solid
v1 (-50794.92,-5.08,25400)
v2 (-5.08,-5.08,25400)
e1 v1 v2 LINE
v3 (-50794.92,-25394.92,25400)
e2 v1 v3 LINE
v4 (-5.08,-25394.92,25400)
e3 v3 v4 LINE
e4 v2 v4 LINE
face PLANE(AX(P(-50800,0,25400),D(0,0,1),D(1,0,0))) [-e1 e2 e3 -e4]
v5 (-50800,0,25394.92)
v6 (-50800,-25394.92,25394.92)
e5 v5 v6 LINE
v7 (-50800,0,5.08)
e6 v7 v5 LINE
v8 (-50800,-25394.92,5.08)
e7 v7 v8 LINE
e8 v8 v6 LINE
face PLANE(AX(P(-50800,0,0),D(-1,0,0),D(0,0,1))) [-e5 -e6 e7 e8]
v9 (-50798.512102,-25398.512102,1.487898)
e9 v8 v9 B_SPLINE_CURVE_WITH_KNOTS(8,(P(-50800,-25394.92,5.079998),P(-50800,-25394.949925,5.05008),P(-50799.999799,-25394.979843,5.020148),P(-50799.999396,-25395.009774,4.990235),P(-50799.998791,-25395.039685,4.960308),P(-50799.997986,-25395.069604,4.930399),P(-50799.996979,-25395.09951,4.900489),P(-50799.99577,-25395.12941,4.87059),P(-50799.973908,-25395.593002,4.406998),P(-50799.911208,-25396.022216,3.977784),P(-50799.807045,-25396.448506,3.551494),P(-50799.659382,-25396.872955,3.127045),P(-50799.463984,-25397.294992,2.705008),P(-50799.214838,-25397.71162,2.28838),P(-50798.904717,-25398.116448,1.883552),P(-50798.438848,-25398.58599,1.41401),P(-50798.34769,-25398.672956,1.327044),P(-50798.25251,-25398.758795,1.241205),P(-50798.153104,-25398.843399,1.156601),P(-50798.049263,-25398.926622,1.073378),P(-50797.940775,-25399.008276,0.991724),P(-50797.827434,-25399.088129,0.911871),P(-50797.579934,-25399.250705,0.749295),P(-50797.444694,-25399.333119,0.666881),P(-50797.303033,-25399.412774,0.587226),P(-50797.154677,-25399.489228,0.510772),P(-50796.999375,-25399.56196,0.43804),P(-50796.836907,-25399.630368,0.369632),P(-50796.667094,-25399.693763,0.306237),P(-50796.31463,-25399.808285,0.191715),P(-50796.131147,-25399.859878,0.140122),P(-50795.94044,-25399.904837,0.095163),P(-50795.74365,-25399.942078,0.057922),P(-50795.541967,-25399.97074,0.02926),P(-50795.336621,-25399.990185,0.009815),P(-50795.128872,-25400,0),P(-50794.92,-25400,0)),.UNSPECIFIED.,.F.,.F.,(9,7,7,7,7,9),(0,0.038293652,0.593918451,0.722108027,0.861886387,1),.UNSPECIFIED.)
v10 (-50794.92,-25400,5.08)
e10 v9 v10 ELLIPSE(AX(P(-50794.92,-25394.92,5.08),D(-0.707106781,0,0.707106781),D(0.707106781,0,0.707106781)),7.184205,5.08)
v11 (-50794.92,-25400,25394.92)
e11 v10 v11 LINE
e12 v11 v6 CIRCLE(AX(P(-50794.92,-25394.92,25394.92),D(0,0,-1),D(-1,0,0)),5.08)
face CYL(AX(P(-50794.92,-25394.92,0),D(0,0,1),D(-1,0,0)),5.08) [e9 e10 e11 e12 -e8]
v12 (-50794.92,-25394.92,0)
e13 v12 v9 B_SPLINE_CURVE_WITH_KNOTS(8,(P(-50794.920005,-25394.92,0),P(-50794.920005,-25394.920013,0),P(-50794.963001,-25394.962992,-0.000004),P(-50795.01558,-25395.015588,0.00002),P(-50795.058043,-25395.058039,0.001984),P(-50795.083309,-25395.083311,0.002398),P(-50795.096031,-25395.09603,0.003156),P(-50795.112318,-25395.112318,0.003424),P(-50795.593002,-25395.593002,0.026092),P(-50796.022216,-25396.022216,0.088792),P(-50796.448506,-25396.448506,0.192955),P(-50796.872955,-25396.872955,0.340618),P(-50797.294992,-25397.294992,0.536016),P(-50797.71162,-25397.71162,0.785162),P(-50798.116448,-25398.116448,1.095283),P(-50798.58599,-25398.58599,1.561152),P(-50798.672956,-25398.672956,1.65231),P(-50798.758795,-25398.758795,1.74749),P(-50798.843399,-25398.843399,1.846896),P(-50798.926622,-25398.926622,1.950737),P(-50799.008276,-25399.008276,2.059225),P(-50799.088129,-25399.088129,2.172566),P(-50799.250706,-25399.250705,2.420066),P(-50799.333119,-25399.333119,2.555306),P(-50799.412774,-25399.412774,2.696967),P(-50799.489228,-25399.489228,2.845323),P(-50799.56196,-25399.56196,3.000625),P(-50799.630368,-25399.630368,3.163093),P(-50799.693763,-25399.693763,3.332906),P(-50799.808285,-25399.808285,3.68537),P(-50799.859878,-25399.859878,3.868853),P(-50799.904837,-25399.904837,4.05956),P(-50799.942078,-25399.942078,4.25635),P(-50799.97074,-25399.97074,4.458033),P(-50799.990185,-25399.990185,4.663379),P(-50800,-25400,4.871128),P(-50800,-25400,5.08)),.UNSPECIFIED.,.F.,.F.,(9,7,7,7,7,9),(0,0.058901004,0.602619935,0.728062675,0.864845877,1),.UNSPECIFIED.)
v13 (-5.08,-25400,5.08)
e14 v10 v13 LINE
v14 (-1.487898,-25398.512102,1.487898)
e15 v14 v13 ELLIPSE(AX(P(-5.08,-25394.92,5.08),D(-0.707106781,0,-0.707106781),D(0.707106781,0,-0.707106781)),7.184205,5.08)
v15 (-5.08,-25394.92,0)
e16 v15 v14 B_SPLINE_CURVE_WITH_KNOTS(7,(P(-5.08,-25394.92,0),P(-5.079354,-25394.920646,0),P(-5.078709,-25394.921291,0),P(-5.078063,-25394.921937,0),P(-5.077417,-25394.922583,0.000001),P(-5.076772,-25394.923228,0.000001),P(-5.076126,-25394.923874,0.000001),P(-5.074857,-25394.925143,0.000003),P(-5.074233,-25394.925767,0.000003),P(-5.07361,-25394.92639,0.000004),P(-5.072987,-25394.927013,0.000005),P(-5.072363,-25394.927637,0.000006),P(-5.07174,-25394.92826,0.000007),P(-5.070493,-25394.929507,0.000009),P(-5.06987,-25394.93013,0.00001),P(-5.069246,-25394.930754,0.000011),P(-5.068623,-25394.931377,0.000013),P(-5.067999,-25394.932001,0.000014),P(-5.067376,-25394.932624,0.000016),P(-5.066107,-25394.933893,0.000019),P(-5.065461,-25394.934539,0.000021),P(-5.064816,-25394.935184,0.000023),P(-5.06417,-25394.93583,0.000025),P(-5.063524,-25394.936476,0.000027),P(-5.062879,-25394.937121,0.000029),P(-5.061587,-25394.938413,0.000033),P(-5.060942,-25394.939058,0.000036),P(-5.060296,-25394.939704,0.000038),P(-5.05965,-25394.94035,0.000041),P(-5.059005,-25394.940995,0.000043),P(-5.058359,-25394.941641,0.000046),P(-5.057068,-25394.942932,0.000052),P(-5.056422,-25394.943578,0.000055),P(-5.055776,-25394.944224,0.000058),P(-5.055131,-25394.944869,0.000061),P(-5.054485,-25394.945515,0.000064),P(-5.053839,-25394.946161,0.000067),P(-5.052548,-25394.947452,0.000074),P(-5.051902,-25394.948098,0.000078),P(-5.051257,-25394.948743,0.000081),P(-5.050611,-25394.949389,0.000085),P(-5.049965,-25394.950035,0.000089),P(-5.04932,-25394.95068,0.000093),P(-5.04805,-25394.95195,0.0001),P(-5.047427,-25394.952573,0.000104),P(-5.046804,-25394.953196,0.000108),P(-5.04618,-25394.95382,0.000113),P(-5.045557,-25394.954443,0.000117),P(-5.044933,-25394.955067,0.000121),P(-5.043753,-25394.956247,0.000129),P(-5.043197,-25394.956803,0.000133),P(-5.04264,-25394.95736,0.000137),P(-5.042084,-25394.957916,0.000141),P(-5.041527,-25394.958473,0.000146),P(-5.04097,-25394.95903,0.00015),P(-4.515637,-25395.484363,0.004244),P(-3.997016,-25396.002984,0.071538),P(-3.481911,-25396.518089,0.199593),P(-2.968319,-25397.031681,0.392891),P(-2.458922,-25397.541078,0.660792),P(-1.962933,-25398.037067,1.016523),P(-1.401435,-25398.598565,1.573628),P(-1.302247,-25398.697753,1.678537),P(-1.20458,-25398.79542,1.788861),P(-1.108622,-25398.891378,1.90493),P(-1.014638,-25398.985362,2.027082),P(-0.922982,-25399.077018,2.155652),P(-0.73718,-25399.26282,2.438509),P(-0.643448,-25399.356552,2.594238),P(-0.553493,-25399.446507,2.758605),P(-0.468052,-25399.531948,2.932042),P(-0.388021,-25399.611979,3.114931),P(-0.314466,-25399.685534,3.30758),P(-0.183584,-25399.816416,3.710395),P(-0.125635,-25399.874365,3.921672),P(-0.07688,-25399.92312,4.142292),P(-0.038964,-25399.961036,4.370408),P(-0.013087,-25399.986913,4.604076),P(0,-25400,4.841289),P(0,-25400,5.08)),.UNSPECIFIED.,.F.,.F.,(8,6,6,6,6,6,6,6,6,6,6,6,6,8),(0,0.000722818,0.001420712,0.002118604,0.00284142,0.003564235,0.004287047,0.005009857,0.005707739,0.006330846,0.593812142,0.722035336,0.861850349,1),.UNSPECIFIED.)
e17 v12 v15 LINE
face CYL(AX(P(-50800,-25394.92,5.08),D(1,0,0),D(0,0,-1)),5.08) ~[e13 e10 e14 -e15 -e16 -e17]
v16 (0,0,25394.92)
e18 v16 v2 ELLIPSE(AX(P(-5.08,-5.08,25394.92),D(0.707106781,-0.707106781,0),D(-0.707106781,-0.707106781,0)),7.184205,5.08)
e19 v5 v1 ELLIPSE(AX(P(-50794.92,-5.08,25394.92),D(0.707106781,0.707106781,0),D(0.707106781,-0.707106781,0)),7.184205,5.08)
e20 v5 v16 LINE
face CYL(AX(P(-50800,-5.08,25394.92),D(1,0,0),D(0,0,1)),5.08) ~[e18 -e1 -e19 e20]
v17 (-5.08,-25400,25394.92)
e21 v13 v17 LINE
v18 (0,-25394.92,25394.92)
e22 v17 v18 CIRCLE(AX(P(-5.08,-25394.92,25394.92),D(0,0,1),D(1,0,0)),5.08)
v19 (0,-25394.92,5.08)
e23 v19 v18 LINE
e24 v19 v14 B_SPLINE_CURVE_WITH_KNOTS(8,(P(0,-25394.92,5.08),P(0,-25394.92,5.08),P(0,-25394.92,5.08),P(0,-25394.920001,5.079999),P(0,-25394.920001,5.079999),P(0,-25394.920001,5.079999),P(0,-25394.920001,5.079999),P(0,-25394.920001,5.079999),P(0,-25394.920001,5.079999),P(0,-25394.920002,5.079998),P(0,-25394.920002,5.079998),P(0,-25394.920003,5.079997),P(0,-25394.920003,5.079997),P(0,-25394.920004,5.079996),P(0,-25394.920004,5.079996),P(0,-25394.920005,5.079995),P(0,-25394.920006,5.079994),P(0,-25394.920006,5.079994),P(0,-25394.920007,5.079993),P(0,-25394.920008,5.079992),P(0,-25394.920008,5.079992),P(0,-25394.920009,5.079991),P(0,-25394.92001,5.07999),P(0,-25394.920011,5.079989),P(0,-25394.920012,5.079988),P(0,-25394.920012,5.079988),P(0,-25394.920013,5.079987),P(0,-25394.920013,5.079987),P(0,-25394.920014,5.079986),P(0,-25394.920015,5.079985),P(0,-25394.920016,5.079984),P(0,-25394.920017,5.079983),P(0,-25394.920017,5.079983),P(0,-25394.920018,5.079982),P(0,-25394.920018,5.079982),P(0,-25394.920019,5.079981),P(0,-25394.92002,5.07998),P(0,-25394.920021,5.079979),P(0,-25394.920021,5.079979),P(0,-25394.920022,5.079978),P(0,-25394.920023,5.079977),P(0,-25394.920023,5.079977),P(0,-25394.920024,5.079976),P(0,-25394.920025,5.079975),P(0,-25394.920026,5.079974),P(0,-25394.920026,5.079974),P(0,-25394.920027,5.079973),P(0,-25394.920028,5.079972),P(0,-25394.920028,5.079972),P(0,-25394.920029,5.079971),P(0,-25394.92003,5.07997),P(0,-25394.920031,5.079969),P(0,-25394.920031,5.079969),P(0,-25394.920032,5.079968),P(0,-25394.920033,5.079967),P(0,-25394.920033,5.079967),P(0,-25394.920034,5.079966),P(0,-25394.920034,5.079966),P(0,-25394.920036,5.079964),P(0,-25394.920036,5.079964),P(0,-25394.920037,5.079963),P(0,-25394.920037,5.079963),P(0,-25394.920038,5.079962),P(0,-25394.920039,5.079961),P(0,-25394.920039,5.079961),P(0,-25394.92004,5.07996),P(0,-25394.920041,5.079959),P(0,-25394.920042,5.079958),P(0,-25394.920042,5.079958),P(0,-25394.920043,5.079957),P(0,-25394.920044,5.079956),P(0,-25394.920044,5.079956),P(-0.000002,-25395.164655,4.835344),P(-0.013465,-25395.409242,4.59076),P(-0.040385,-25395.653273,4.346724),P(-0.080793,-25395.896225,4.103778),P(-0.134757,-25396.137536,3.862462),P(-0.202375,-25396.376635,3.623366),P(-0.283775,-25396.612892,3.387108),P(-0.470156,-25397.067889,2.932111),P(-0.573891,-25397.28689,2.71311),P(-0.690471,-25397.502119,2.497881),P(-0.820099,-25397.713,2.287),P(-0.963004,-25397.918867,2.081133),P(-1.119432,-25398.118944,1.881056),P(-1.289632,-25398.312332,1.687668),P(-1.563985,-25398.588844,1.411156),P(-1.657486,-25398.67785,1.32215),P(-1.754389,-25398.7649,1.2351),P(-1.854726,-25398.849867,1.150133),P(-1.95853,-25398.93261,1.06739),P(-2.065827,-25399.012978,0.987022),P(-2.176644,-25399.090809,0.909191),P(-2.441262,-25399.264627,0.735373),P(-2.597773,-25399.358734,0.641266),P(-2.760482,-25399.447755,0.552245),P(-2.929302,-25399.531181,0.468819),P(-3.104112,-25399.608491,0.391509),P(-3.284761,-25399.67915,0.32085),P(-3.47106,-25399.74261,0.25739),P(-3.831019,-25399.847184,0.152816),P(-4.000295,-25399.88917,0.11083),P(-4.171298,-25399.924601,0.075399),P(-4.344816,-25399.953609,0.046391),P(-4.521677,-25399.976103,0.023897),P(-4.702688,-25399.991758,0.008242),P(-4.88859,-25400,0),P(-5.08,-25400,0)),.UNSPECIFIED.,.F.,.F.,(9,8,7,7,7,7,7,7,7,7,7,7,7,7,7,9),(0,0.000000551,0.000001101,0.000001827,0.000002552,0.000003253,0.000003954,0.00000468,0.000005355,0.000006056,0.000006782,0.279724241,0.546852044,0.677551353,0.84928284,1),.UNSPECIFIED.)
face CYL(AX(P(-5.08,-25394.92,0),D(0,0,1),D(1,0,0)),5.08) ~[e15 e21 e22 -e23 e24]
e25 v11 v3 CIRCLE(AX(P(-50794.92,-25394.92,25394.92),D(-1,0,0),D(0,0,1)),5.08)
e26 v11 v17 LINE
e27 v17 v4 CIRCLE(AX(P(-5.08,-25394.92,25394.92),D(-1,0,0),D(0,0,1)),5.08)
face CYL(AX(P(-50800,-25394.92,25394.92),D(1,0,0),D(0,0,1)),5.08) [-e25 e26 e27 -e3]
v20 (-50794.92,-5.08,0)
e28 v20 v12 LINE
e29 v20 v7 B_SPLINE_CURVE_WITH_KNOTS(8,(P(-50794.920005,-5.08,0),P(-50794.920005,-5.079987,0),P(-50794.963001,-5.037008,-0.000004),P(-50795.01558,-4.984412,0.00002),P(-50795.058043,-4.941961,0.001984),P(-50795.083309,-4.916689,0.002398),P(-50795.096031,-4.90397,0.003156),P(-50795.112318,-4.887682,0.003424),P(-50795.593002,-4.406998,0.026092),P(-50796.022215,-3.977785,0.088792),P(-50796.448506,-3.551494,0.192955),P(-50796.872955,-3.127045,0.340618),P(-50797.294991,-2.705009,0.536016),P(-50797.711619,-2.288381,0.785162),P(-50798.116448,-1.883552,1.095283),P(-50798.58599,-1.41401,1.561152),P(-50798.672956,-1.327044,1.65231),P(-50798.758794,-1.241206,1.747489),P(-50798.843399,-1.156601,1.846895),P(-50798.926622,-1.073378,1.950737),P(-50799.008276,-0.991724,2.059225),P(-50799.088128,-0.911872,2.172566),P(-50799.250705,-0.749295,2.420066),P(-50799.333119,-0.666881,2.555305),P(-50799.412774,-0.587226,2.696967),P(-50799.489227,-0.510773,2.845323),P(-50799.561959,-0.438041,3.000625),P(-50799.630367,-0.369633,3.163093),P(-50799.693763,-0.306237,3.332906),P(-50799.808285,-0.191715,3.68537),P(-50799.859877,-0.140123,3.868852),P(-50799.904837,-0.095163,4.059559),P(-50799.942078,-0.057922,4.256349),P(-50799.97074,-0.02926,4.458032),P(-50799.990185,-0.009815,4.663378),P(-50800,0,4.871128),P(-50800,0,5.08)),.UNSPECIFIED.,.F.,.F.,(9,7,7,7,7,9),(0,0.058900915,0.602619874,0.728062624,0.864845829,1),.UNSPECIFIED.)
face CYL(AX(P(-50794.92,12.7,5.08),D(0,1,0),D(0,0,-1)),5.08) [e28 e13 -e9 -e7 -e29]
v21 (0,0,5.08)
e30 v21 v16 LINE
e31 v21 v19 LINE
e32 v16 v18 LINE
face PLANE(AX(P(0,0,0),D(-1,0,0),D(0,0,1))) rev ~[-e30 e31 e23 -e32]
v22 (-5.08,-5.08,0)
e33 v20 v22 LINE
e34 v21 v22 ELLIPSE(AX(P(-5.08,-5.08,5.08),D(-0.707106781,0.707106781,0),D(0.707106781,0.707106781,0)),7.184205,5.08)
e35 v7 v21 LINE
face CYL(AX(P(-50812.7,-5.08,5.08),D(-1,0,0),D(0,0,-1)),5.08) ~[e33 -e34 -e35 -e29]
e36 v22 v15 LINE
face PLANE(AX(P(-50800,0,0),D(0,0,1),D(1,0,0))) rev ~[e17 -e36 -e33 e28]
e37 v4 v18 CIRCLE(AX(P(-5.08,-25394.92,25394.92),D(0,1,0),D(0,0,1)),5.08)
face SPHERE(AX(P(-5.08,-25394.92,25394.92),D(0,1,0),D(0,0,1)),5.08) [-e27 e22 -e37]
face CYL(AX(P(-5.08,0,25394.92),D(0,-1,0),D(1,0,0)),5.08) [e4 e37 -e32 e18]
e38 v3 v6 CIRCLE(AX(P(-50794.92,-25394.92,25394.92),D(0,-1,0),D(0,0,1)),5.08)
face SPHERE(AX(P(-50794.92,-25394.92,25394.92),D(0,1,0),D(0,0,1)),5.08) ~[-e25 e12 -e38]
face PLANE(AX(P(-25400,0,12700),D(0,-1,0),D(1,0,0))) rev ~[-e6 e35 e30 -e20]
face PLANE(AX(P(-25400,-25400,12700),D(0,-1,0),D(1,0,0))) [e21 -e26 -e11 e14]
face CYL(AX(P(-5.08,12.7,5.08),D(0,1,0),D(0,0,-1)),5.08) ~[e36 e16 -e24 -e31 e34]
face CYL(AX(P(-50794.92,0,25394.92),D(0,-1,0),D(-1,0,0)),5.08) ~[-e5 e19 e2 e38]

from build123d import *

# Parameters (mm, degrees)
F0_W        = 50800
F0_H        = 25400
F1_DEPTH    = 25400
F2_R        = 5.08
F3_T1_DEPTH = 25420.32
F3_T3_DEPTH = 50825.4


# Not quite as in the source:
# - a fillet or chamfer that OpenCascade refuses, or shapes differently, is made with other operations: its cross-section is extruded or revolved along the edge and cut away or added


with BuildPart() as f1:
    # F0 (on Front) → F1 (new body)
    with BuildSketch(Plane.XZ):
        with Locations((-25400, 12700)):
            Rectangle(F0_W, F0_H)
    extrude(amount=F1_DEPTH)

    # F2
    f2_edges = [f1.edges().sort_by_distance(p)[0] for p in [
        (0, -12700, 25400),
        (-50800, -12700, 25400),
        (-25400, 0, 25400),
        (-25400, -25400, 25400),
        (-25400, -25400, 0),
        (0, -25400, 12700),
        (-50800, -25400, 12700),
    ]]
    fillet(f2_edges, radius=F2_R)

    # F3: fillet of radius 5.08 on 8 edges, made by hand

    # F3_s2 → F3_t1 (cut)
    with BuildSketch(Plane.XZ.offset(-12.7)):
        with BuildLine():
            ThreePointArc((-50794.92, 0), (-50798.5121024484, 1.4878975516), (-50800, 5.08))
            Line((-50800, 5.08), (-50800, 0))
            Line((-50800, 0), (-50794.92, 0))
        make_face()
        with BuildLine():
            ThreePointArc((-5.08, 0), (-1.4878975516, 1.4878975516), (0, 5.08))
            Line((0, 5.08), (0, 0))
            Line((0, 0), (-5.08, 0))
        make_face()
    extrude(amount=F3_T1_DEPTH, mode=Mode.SUBTRACT)

    # F3_s4 → F3_t3 (cut)
    with BuildSketch(Plane.YZ.offset(-50812.7)):
        with BuildLine():
            ThreePointArc((-5.08, 0), (-1.4878975516, 1.4878975516), (0, 5.08))
            Line((0, 5.08), (0, 0))
            Line((0, 0), (-5.08, 0))
        make_face()
    extrude(amount=F3_T3_DEPTH, mode=Mode.SUBTRACT)


solid = f1.part
